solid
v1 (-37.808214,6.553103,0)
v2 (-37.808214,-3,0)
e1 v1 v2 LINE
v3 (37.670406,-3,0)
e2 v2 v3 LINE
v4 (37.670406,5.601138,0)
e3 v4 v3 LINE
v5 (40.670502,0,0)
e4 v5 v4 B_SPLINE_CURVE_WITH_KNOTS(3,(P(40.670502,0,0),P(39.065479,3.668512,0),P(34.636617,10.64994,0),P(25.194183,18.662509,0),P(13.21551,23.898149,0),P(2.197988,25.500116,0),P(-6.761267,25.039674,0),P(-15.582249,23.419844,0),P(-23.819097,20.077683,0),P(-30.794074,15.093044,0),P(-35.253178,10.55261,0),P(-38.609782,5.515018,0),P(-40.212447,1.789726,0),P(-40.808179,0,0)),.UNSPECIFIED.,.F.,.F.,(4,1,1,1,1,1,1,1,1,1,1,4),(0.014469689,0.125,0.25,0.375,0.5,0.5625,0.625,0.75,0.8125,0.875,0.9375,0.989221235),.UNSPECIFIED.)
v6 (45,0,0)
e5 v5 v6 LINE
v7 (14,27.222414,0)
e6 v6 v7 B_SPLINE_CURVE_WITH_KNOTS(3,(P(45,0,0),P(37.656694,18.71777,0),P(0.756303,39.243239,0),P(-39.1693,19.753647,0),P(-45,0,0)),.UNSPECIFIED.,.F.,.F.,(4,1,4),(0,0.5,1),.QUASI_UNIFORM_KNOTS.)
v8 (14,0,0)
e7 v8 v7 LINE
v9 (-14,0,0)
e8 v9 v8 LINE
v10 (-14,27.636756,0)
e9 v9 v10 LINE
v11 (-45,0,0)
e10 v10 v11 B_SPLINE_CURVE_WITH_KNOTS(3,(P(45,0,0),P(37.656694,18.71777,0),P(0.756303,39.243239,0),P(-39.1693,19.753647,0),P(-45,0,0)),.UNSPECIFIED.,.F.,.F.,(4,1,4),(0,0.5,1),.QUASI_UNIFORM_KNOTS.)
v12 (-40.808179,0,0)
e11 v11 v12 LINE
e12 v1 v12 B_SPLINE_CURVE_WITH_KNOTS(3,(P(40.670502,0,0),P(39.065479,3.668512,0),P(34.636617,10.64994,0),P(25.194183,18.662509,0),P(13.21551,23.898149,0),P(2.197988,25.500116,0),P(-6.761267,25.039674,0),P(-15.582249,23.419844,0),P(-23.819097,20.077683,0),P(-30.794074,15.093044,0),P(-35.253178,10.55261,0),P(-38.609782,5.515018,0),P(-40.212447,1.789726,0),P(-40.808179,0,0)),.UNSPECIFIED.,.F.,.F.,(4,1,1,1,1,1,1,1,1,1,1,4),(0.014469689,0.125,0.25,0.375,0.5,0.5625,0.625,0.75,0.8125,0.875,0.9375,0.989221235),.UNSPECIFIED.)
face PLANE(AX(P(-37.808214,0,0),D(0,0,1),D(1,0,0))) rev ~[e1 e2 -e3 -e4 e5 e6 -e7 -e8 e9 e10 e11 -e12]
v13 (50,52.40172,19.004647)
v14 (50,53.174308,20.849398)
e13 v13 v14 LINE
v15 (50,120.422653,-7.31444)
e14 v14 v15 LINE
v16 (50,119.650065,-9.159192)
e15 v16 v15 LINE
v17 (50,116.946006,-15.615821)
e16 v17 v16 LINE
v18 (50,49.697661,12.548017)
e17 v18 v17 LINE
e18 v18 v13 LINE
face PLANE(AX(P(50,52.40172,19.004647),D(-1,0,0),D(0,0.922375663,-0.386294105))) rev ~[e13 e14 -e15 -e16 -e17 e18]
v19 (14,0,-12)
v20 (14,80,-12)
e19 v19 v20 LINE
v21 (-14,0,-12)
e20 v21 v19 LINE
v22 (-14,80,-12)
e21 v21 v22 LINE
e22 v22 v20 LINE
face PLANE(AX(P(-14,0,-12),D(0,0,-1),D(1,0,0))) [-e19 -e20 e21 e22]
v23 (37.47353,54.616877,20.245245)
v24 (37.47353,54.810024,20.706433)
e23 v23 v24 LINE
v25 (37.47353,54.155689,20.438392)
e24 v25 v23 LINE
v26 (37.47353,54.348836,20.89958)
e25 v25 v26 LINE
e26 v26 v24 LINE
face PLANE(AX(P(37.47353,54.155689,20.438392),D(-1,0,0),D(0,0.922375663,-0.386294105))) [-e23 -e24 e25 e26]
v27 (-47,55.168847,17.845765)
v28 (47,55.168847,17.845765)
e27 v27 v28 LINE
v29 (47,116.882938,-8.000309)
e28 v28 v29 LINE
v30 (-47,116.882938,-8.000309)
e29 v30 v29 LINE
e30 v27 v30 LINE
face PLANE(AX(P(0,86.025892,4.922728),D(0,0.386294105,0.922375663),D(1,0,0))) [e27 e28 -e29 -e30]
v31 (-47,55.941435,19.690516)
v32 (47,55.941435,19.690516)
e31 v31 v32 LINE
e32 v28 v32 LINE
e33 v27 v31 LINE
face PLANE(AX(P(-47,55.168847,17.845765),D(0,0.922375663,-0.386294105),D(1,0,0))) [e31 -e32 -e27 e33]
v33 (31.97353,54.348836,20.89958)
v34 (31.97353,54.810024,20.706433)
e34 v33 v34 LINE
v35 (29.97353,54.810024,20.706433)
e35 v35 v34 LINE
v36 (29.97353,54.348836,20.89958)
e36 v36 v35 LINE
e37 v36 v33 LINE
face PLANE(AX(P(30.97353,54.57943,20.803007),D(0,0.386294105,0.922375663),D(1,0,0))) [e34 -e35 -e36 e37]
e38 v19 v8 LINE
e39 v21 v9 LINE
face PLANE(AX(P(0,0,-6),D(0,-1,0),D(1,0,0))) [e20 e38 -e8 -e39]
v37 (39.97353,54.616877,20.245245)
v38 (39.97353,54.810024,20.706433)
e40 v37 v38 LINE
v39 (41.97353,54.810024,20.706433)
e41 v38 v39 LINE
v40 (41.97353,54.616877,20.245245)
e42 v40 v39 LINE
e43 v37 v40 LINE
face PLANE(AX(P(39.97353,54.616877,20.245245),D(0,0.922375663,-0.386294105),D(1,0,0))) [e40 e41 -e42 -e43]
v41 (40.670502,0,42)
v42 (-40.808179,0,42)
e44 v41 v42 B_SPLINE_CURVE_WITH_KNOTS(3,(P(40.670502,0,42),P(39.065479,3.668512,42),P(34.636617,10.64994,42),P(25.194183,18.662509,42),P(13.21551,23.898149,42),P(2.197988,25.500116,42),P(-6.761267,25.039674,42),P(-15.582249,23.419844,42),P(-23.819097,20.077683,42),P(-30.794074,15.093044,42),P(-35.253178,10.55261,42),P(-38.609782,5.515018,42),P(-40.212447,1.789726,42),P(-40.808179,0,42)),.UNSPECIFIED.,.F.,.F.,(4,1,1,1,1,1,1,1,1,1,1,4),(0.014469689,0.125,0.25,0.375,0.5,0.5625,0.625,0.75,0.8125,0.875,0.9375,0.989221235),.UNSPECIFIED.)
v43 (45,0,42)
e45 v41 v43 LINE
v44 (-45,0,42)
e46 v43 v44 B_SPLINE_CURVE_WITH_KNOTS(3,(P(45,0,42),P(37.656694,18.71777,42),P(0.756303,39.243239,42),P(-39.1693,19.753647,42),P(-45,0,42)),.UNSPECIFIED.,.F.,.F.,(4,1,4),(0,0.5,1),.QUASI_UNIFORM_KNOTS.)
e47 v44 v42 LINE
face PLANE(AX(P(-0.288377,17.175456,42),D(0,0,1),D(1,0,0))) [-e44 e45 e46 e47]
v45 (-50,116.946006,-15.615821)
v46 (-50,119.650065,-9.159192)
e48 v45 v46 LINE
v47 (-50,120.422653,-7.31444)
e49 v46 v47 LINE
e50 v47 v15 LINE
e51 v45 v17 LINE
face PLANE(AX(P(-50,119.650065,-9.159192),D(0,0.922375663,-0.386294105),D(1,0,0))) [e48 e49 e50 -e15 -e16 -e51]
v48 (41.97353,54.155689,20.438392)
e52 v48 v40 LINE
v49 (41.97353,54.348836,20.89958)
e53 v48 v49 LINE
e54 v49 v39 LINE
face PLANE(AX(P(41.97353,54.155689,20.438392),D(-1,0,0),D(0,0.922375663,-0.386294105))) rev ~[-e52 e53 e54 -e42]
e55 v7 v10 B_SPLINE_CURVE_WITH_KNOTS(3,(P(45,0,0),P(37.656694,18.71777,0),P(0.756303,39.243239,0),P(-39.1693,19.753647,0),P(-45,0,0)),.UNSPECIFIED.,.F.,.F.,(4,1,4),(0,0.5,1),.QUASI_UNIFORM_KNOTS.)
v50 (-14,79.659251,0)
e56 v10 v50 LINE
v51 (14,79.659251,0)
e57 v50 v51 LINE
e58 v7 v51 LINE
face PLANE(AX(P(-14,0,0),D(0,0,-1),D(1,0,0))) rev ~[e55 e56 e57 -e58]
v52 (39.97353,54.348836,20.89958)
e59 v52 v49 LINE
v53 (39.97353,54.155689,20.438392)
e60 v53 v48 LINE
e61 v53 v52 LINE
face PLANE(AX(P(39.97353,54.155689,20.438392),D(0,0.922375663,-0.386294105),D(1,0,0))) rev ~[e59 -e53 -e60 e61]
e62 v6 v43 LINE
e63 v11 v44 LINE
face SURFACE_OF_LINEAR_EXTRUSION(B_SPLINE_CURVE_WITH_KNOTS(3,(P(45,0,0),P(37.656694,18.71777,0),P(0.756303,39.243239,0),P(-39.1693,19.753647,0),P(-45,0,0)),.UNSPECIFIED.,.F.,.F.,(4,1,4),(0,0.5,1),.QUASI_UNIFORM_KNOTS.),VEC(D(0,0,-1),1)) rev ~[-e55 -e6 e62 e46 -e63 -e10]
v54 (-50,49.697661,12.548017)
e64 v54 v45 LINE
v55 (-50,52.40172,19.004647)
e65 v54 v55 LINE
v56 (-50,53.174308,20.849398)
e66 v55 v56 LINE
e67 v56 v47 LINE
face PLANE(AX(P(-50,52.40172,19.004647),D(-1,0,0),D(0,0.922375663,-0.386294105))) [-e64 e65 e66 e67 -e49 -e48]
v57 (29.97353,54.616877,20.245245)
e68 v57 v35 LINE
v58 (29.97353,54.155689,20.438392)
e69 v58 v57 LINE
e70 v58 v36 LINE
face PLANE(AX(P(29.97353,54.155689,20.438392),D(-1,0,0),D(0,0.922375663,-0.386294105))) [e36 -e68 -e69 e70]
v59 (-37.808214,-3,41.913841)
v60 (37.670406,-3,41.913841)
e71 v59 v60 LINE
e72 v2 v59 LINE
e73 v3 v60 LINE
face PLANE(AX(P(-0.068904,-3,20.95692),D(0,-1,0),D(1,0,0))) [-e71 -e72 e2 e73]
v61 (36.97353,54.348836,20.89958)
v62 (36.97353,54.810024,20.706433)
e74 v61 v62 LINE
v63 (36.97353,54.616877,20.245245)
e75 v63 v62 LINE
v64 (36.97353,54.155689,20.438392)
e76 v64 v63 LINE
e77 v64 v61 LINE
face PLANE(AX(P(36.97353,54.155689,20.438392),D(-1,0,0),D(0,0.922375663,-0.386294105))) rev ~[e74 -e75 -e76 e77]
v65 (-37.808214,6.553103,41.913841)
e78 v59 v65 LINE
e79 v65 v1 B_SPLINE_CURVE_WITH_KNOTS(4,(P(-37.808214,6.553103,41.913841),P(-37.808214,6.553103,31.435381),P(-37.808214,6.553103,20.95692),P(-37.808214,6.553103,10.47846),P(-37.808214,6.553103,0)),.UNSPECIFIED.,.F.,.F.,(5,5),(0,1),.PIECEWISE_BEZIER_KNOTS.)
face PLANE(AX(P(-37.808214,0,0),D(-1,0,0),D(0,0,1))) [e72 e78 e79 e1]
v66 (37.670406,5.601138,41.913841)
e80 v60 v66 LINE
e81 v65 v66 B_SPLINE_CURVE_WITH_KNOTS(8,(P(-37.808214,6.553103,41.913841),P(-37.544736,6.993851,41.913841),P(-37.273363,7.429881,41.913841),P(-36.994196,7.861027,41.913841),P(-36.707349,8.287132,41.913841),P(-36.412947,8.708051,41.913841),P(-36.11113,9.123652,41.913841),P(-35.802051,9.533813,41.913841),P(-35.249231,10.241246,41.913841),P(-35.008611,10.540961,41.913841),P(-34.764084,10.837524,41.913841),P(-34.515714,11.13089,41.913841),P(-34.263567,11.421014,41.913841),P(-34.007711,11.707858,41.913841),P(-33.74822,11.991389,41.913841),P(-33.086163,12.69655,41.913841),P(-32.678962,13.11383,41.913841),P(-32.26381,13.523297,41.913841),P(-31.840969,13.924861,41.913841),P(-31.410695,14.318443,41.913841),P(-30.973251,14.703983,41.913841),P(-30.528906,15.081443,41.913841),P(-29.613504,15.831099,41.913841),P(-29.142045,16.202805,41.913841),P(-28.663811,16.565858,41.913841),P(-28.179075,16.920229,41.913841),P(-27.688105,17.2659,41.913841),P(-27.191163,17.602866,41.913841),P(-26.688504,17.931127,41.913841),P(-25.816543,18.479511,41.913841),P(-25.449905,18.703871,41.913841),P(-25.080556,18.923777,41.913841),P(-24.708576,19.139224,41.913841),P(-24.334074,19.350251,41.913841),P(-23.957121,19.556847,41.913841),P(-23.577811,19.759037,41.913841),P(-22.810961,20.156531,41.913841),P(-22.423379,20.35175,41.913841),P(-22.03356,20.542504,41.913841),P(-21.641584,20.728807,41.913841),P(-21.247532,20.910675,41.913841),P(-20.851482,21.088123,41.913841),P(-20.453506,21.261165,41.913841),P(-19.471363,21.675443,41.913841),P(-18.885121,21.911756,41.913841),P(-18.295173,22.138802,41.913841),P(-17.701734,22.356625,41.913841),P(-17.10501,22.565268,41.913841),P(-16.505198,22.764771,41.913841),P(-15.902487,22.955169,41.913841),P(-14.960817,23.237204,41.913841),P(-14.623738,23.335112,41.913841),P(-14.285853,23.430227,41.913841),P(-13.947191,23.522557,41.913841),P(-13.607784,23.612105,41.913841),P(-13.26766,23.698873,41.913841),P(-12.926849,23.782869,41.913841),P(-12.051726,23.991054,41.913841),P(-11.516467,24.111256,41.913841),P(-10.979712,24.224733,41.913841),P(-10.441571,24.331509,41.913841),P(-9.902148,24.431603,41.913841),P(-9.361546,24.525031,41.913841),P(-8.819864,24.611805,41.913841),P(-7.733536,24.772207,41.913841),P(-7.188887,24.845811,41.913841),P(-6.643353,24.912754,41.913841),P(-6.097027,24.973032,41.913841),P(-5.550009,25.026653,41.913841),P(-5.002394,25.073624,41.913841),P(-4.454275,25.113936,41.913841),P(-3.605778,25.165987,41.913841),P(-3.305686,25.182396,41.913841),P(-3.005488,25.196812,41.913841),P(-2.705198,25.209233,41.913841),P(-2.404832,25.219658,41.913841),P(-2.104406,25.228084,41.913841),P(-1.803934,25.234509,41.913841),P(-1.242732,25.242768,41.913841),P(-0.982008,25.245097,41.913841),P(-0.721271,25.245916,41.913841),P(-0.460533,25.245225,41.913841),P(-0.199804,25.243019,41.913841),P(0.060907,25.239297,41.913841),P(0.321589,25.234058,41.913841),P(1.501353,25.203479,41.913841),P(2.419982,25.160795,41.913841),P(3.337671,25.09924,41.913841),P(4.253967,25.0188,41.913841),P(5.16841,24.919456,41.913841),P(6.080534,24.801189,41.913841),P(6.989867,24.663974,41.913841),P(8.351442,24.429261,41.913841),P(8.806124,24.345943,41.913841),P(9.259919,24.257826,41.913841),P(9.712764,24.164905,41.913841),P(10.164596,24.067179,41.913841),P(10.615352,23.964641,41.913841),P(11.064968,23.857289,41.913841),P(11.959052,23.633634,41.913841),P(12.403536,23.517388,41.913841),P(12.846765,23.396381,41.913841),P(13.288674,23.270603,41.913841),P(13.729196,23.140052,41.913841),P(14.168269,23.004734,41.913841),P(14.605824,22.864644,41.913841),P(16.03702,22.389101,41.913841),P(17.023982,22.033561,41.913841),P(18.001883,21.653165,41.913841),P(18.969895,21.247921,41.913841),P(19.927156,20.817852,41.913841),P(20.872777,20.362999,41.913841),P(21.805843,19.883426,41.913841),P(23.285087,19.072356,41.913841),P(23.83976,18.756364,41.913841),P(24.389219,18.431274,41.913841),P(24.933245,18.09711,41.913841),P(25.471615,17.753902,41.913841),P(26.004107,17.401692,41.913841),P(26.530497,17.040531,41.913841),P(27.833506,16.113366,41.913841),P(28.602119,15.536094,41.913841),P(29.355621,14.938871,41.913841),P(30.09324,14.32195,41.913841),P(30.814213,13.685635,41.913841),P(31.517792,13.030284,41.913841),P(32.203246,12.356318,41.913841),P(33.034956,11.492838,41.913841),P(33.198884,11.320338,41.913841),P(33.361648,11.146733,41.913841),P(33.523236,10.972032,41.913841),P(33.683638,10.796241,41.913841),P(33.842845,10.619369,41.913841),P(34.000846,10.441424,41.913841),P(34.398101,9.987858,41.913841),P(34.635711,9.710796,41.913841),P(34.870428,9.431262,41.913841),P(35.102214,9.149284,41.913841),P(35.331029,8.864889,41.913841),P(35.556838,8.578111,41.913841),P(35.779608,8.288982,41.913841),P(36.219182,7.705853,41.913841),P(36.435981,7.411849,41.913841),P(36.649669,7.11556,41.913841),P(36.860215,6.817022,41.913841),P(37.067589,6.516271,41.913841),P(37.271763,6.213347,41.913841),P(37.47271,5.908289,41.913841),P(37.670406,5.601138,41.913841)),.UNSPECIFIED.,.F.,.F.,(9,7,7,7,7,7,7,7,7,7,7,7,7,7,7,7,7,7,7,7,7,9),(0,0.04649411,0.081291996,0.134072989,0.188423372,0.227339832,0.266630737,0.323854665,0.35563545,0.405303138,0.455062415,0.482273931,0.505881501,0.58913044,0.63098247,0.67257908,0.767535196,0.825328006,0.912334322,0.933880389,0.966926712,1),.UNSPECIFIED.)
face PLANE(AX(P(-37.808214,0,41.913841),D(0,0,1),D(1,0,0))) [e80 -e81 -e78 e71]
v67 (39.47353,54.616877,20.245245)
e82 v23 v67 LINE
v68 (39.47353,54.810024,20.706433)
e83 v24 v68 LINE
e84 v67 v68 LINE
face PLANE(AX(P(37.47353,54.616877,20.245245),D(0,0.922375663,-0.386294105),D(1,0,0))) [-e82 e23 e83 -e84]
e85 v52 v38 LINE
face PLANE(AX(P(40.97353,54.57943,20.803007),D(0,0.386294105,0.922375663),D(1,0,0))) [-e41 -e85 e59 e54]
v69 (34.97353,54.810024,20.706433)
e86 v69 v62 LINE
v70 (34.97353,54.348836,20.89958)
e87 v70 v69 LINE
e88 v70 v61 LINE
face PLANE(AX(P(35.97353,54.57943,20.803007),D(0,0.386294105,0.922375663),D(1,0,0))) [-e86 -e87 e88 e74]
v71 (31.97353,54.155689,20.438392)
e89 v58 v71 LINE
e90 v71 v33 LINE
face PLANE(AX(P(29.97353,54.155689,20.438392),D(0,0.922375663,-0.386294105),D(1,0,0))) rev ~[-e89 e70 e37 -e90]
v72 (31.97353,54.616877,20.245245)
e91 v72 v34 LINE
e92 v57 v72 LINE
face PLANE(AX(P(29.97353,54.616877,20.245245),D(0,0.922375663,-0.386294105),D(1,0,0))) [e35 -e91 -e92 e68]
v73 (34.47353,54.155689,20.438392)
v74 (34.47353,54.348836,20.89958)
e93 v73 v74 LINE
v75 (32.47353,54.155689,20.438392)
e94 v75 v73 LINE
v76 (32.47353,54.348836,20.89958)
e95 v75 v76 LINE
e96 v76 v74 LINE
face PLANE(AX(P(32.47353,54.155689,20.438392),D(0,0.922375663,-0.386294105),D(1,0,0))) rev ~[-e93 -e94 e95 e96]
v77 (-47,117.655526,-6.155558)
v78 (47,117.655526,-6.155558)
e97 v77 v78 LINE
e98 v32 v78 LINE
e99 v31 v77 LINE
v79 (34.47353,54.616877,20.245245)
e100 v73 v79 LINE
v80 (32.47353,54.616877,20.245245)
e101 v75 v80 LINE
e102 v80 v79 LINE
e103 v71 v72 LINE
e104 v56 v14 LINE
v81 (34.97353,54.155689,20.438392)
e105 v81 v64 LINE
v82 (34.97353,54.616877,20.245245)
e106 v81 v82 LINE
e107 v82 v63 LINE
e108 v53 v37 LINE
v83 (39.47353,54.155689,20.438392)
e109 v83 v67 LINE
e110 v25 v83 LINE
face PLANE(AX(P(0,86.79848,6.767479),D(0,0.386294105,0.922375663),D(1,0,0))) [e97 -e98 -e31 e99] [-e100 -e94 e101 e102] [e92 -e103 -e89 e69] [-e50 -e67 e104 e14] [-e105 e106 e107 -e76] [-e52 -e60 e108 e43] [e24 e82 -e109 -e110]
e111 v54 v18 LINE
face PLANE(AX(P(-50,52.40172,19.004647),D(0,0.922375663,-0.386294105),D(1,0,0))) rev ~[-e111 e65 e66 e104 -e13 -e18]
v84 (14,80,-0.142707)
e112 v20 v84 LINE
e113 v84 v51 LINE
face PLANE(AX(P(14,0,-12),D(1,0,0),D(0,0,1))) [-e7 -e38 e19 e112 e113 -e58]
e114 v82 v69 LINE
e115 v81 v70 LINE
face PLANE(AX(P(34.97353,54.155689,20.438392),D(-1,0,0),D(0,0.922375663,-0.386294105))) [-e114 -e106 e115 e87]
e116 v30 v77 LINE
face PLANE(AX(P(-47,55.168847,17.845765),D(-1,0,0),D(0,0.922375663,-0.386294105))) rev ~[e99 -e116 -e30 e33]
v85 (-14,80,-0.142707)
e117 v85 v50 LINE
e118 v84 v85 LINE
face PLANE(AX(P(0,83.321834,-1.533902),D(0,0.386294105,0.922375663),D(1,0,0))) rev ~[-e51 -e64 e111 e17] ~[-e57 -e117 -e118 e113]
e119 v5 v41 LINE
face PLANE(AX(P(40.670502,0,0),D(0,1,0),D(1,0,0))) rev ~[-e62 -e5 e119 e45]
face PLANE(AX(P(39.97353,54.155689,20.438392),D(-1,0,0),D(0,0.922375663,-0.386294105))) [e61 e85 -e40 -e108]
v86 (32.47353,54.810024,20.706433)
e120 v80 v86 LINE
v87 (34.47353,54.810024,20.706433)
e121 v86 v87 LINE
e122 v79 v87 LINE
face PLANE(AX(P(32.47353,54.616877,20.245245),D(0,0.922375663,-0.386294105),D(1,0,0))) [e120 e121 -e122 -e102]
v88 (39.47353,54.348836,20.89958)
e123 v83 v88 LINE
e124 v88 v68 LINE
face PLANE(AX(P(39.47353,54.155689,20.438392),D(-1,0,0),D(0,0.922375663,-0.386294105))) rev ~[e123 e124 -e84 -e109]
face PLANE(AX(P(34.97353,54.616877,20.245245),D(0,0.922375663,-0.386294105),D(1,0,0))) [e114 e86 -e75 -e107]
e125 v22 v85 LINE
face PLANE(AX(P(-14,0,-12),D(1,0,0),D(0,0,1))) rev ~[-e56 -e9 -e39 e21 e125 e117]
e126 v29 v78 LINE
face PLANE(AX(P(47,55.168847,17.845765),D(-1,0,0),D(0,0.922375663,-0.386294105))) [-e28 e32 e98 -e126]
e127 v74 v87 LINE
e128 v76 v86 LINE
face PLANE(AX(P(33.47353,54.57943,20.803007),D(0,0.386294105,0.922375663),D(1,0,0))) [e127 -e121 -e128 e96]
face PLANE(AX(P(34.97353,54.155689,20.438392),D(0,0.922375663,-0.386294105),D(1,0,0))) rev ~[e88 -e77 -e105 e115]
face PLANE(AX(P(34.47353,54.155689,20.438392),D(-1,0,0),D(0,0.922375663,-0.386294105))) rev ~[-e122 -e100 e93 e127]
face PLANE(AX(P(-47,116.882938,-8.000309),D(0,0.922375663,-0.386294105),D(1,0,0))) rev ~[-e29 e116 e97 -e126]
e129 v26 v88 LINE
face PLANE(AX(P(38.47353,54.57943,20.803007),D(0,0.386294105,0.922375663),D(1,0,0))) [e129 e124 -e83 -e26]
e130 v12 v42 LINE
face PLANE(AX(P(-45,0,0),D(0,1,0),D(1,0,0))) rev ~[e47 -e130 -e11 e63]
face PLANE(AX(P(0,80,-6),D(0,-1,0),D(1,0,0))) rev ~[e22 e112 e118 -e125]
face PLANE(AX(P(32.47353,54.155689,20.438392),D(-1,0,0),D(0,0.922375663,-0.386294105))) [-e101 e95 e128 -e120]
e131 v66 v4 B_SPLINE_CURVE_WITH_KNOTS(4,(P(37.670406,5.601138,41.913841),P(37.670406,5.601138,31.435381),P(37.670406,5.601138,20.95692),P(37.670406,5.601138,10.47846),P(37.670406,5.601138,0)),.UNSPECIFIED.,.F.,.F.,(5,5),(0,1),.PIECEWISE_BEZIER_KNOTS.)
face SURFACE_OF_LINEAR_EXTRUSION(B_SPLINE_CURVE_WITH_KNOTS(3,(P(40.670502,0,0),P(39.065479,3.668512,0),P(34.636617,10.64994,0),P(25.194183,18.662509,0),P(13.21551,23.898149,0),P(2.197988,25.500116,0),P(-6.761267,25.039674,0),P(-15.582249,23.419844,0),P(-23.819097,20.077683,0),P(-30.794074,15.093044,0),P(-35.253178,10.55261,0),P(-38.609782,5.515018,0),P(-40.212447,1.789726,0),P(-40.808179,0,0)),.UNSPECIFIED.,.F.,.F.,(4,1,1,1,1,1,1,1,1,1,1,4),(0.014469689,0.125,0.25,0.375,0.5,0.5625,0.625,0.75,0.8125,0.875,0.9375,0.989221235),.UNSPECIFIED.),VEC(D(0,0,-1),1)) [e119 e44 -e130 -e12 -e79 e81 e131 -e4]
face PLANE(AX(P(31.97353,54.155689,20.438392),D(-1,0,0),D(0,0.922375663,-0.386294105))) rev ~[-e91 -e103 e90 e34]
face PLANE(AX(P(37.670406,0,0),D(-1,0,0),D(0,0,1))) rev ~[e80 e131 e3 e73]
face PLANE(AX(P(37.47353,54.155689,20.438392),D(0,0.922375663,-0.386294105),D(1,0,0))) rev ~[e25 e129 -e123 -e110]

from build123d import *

# Parameters (mm, degrees)
F1_DEPTH  = 42
F2_W      = 75.478619273
F2_H      = 41.9138409197
F4_W      = 75.478619273
F4_H      = 41.9138409197
F5_DEPTH  = 3
F6_W      = 28
F6_H      = 12
F8_DEPTH  = 80
F11_W     = 100
F11_H     = 72.9077620213
F12_DEPTH = 7
F13_W     = 100
F13_H     = 72.9077620213
F13_W_2   = 94
F13_H_2   = 66.9077620213
F14_DEPTH = 2
F15_W     = 2
F15_H     = 0.5
F16_DEPTH = 0.5


# Not quite as in the source:
# - ends of sketch curves that miss each other by under 0.0002 mm in the source are joined
# - the dataset's text gives a spline's control points without its knots; the knots are read off the source's solid


with BuildPart() as f1:
    # F0 (on Top) → F1 (new body)
    with BuildSketch(Plane.XY):
        with BuildLine():
            Line((40.6705020705, 0), (45, 0))
            add(Edge.make_bspline(
                [(45, 0), (37.6566936716, 18.7177697445), (0.7563031661, 39.2432392178), (-39.1693000037, 19.753647335), (-45, 0)],
                knots=[0, 0, 0, 0, 0.5, 1, 1, 1, 1], degree=3))
            Line((-45, 0), (-40.8081785045, 0))
            add(Edge.make_bspline(
                [(40.6705020705, 0), (39.0654786869, 3.6685119371), (34.6366166878, 10.6499395063), (25.1941828283, 18.6625093529), (13.2155095249, 23.898149118), (2.1979882903, 25.5001155824), (-6.7612672319, 25.0396744323), (-15.5822493226, 23.419843787), (-23.8190972997, 20.0776830737), (-30.7940742115, 15.0930436532), (-35.2531784066, 10.5526098036), (-38.6097824931, 5.5150177421), (-40.2124471126, 1.7897260912), (-40.8081785045, 0)],
                knots=[0.0144696894, 0.0144696894, 0.0144696894, 0.0144696894, 0.125, 0.25, 0.375, 0.5, 0.5625, 0.625, 0.75, 0.8125, 0.875, 0.9375, 0.989221235, 0.989221235, 0.989221235, 0.989221235], degree=3))
        make_face()
    extrude(amount=F1_DEPTH)

    # F2 (on Front) → F3 (join, up to the next surface of F1)
    with BuildSketch(Plane.XZ):
        with Locations((-0.0689039235, 20.9569204599)):
            Rectangle(F2_W, F2_H)
    extrude(until=Until.NEXT, dir=(0, 1, 0))

    # F4 (on face) → F5 (join)
    with BuildSketch(Plane.XZ):
        with Locations((-0.0689039235, 20.9569204599)):
            Rectangle(F4_W, F4_H)
    extrude(amount=F5_DEPTH)

    # F6 (on Front) → F8 (join)
    with BuildSketch(Plane.XZ):
        with Locations((0, -6)):
            Rectangle(F6_W, F6_H)
    extrude(amount=-F8_DEPTH)

    # F11 (on face) → F12 (join)
    with BuildSketch(Plane(origin=(0, 11.8870032706, 28.3832509576), x_dir=(1, 0, 0), z_dir=(0, 0.3862941051, 0.9223756634))):
        with Locations((0, 77.4465687573)):
            Rectangle(F11_W, F11_H)
    extrude(amount=F12_DEPTH)

    # F13 (on face) → F14 (join)
    with BuildSketch(Plane(origin=(0, 14.591062006, 34.8398806013), x_dir=(1, 0, 0), z_dir=(0, 0.3862941051, 0.9223756634))):
        with Locations((0, 77.4465687573)):
            Rectangle(F13_W, F13_H)
        with Locations((0, 77.4465687573)):
            Rectangle(F13_W_2, F13_H_2, mode=Mode.SUBTRACT)
    extrude(amount=F14_DEPTH)

    # F15 (on face) → F16 (join)
    with BuildSketch(Plane(origin=(0, 15.3636502161, 36.684631928), x_dir=(1, 0, 0), z_dir=(0, 0.3862941051, 0.9223756634))):
        with Locations((33.4735295493, 42.3066589715)):
            Rectangle(F15_W, F15_H)
        with Locations((35.9735295493, 42.3066589715)):
            Rectangle(F15_W, F15_H)
        with Locations((38.4735295493, 42.3066589715)):
            Rectangle(F15_W, F15_H)
        with Locations((40.9735295493, 42.3066589715)):
            Rectangle(F15_W, F15_H)
        with Locations((30.9735295493, 42.3066589715)):
            Rectangle(F15_W, F15_H)
    extrude(amount=F16_DEPTH)


solid = f1.part
